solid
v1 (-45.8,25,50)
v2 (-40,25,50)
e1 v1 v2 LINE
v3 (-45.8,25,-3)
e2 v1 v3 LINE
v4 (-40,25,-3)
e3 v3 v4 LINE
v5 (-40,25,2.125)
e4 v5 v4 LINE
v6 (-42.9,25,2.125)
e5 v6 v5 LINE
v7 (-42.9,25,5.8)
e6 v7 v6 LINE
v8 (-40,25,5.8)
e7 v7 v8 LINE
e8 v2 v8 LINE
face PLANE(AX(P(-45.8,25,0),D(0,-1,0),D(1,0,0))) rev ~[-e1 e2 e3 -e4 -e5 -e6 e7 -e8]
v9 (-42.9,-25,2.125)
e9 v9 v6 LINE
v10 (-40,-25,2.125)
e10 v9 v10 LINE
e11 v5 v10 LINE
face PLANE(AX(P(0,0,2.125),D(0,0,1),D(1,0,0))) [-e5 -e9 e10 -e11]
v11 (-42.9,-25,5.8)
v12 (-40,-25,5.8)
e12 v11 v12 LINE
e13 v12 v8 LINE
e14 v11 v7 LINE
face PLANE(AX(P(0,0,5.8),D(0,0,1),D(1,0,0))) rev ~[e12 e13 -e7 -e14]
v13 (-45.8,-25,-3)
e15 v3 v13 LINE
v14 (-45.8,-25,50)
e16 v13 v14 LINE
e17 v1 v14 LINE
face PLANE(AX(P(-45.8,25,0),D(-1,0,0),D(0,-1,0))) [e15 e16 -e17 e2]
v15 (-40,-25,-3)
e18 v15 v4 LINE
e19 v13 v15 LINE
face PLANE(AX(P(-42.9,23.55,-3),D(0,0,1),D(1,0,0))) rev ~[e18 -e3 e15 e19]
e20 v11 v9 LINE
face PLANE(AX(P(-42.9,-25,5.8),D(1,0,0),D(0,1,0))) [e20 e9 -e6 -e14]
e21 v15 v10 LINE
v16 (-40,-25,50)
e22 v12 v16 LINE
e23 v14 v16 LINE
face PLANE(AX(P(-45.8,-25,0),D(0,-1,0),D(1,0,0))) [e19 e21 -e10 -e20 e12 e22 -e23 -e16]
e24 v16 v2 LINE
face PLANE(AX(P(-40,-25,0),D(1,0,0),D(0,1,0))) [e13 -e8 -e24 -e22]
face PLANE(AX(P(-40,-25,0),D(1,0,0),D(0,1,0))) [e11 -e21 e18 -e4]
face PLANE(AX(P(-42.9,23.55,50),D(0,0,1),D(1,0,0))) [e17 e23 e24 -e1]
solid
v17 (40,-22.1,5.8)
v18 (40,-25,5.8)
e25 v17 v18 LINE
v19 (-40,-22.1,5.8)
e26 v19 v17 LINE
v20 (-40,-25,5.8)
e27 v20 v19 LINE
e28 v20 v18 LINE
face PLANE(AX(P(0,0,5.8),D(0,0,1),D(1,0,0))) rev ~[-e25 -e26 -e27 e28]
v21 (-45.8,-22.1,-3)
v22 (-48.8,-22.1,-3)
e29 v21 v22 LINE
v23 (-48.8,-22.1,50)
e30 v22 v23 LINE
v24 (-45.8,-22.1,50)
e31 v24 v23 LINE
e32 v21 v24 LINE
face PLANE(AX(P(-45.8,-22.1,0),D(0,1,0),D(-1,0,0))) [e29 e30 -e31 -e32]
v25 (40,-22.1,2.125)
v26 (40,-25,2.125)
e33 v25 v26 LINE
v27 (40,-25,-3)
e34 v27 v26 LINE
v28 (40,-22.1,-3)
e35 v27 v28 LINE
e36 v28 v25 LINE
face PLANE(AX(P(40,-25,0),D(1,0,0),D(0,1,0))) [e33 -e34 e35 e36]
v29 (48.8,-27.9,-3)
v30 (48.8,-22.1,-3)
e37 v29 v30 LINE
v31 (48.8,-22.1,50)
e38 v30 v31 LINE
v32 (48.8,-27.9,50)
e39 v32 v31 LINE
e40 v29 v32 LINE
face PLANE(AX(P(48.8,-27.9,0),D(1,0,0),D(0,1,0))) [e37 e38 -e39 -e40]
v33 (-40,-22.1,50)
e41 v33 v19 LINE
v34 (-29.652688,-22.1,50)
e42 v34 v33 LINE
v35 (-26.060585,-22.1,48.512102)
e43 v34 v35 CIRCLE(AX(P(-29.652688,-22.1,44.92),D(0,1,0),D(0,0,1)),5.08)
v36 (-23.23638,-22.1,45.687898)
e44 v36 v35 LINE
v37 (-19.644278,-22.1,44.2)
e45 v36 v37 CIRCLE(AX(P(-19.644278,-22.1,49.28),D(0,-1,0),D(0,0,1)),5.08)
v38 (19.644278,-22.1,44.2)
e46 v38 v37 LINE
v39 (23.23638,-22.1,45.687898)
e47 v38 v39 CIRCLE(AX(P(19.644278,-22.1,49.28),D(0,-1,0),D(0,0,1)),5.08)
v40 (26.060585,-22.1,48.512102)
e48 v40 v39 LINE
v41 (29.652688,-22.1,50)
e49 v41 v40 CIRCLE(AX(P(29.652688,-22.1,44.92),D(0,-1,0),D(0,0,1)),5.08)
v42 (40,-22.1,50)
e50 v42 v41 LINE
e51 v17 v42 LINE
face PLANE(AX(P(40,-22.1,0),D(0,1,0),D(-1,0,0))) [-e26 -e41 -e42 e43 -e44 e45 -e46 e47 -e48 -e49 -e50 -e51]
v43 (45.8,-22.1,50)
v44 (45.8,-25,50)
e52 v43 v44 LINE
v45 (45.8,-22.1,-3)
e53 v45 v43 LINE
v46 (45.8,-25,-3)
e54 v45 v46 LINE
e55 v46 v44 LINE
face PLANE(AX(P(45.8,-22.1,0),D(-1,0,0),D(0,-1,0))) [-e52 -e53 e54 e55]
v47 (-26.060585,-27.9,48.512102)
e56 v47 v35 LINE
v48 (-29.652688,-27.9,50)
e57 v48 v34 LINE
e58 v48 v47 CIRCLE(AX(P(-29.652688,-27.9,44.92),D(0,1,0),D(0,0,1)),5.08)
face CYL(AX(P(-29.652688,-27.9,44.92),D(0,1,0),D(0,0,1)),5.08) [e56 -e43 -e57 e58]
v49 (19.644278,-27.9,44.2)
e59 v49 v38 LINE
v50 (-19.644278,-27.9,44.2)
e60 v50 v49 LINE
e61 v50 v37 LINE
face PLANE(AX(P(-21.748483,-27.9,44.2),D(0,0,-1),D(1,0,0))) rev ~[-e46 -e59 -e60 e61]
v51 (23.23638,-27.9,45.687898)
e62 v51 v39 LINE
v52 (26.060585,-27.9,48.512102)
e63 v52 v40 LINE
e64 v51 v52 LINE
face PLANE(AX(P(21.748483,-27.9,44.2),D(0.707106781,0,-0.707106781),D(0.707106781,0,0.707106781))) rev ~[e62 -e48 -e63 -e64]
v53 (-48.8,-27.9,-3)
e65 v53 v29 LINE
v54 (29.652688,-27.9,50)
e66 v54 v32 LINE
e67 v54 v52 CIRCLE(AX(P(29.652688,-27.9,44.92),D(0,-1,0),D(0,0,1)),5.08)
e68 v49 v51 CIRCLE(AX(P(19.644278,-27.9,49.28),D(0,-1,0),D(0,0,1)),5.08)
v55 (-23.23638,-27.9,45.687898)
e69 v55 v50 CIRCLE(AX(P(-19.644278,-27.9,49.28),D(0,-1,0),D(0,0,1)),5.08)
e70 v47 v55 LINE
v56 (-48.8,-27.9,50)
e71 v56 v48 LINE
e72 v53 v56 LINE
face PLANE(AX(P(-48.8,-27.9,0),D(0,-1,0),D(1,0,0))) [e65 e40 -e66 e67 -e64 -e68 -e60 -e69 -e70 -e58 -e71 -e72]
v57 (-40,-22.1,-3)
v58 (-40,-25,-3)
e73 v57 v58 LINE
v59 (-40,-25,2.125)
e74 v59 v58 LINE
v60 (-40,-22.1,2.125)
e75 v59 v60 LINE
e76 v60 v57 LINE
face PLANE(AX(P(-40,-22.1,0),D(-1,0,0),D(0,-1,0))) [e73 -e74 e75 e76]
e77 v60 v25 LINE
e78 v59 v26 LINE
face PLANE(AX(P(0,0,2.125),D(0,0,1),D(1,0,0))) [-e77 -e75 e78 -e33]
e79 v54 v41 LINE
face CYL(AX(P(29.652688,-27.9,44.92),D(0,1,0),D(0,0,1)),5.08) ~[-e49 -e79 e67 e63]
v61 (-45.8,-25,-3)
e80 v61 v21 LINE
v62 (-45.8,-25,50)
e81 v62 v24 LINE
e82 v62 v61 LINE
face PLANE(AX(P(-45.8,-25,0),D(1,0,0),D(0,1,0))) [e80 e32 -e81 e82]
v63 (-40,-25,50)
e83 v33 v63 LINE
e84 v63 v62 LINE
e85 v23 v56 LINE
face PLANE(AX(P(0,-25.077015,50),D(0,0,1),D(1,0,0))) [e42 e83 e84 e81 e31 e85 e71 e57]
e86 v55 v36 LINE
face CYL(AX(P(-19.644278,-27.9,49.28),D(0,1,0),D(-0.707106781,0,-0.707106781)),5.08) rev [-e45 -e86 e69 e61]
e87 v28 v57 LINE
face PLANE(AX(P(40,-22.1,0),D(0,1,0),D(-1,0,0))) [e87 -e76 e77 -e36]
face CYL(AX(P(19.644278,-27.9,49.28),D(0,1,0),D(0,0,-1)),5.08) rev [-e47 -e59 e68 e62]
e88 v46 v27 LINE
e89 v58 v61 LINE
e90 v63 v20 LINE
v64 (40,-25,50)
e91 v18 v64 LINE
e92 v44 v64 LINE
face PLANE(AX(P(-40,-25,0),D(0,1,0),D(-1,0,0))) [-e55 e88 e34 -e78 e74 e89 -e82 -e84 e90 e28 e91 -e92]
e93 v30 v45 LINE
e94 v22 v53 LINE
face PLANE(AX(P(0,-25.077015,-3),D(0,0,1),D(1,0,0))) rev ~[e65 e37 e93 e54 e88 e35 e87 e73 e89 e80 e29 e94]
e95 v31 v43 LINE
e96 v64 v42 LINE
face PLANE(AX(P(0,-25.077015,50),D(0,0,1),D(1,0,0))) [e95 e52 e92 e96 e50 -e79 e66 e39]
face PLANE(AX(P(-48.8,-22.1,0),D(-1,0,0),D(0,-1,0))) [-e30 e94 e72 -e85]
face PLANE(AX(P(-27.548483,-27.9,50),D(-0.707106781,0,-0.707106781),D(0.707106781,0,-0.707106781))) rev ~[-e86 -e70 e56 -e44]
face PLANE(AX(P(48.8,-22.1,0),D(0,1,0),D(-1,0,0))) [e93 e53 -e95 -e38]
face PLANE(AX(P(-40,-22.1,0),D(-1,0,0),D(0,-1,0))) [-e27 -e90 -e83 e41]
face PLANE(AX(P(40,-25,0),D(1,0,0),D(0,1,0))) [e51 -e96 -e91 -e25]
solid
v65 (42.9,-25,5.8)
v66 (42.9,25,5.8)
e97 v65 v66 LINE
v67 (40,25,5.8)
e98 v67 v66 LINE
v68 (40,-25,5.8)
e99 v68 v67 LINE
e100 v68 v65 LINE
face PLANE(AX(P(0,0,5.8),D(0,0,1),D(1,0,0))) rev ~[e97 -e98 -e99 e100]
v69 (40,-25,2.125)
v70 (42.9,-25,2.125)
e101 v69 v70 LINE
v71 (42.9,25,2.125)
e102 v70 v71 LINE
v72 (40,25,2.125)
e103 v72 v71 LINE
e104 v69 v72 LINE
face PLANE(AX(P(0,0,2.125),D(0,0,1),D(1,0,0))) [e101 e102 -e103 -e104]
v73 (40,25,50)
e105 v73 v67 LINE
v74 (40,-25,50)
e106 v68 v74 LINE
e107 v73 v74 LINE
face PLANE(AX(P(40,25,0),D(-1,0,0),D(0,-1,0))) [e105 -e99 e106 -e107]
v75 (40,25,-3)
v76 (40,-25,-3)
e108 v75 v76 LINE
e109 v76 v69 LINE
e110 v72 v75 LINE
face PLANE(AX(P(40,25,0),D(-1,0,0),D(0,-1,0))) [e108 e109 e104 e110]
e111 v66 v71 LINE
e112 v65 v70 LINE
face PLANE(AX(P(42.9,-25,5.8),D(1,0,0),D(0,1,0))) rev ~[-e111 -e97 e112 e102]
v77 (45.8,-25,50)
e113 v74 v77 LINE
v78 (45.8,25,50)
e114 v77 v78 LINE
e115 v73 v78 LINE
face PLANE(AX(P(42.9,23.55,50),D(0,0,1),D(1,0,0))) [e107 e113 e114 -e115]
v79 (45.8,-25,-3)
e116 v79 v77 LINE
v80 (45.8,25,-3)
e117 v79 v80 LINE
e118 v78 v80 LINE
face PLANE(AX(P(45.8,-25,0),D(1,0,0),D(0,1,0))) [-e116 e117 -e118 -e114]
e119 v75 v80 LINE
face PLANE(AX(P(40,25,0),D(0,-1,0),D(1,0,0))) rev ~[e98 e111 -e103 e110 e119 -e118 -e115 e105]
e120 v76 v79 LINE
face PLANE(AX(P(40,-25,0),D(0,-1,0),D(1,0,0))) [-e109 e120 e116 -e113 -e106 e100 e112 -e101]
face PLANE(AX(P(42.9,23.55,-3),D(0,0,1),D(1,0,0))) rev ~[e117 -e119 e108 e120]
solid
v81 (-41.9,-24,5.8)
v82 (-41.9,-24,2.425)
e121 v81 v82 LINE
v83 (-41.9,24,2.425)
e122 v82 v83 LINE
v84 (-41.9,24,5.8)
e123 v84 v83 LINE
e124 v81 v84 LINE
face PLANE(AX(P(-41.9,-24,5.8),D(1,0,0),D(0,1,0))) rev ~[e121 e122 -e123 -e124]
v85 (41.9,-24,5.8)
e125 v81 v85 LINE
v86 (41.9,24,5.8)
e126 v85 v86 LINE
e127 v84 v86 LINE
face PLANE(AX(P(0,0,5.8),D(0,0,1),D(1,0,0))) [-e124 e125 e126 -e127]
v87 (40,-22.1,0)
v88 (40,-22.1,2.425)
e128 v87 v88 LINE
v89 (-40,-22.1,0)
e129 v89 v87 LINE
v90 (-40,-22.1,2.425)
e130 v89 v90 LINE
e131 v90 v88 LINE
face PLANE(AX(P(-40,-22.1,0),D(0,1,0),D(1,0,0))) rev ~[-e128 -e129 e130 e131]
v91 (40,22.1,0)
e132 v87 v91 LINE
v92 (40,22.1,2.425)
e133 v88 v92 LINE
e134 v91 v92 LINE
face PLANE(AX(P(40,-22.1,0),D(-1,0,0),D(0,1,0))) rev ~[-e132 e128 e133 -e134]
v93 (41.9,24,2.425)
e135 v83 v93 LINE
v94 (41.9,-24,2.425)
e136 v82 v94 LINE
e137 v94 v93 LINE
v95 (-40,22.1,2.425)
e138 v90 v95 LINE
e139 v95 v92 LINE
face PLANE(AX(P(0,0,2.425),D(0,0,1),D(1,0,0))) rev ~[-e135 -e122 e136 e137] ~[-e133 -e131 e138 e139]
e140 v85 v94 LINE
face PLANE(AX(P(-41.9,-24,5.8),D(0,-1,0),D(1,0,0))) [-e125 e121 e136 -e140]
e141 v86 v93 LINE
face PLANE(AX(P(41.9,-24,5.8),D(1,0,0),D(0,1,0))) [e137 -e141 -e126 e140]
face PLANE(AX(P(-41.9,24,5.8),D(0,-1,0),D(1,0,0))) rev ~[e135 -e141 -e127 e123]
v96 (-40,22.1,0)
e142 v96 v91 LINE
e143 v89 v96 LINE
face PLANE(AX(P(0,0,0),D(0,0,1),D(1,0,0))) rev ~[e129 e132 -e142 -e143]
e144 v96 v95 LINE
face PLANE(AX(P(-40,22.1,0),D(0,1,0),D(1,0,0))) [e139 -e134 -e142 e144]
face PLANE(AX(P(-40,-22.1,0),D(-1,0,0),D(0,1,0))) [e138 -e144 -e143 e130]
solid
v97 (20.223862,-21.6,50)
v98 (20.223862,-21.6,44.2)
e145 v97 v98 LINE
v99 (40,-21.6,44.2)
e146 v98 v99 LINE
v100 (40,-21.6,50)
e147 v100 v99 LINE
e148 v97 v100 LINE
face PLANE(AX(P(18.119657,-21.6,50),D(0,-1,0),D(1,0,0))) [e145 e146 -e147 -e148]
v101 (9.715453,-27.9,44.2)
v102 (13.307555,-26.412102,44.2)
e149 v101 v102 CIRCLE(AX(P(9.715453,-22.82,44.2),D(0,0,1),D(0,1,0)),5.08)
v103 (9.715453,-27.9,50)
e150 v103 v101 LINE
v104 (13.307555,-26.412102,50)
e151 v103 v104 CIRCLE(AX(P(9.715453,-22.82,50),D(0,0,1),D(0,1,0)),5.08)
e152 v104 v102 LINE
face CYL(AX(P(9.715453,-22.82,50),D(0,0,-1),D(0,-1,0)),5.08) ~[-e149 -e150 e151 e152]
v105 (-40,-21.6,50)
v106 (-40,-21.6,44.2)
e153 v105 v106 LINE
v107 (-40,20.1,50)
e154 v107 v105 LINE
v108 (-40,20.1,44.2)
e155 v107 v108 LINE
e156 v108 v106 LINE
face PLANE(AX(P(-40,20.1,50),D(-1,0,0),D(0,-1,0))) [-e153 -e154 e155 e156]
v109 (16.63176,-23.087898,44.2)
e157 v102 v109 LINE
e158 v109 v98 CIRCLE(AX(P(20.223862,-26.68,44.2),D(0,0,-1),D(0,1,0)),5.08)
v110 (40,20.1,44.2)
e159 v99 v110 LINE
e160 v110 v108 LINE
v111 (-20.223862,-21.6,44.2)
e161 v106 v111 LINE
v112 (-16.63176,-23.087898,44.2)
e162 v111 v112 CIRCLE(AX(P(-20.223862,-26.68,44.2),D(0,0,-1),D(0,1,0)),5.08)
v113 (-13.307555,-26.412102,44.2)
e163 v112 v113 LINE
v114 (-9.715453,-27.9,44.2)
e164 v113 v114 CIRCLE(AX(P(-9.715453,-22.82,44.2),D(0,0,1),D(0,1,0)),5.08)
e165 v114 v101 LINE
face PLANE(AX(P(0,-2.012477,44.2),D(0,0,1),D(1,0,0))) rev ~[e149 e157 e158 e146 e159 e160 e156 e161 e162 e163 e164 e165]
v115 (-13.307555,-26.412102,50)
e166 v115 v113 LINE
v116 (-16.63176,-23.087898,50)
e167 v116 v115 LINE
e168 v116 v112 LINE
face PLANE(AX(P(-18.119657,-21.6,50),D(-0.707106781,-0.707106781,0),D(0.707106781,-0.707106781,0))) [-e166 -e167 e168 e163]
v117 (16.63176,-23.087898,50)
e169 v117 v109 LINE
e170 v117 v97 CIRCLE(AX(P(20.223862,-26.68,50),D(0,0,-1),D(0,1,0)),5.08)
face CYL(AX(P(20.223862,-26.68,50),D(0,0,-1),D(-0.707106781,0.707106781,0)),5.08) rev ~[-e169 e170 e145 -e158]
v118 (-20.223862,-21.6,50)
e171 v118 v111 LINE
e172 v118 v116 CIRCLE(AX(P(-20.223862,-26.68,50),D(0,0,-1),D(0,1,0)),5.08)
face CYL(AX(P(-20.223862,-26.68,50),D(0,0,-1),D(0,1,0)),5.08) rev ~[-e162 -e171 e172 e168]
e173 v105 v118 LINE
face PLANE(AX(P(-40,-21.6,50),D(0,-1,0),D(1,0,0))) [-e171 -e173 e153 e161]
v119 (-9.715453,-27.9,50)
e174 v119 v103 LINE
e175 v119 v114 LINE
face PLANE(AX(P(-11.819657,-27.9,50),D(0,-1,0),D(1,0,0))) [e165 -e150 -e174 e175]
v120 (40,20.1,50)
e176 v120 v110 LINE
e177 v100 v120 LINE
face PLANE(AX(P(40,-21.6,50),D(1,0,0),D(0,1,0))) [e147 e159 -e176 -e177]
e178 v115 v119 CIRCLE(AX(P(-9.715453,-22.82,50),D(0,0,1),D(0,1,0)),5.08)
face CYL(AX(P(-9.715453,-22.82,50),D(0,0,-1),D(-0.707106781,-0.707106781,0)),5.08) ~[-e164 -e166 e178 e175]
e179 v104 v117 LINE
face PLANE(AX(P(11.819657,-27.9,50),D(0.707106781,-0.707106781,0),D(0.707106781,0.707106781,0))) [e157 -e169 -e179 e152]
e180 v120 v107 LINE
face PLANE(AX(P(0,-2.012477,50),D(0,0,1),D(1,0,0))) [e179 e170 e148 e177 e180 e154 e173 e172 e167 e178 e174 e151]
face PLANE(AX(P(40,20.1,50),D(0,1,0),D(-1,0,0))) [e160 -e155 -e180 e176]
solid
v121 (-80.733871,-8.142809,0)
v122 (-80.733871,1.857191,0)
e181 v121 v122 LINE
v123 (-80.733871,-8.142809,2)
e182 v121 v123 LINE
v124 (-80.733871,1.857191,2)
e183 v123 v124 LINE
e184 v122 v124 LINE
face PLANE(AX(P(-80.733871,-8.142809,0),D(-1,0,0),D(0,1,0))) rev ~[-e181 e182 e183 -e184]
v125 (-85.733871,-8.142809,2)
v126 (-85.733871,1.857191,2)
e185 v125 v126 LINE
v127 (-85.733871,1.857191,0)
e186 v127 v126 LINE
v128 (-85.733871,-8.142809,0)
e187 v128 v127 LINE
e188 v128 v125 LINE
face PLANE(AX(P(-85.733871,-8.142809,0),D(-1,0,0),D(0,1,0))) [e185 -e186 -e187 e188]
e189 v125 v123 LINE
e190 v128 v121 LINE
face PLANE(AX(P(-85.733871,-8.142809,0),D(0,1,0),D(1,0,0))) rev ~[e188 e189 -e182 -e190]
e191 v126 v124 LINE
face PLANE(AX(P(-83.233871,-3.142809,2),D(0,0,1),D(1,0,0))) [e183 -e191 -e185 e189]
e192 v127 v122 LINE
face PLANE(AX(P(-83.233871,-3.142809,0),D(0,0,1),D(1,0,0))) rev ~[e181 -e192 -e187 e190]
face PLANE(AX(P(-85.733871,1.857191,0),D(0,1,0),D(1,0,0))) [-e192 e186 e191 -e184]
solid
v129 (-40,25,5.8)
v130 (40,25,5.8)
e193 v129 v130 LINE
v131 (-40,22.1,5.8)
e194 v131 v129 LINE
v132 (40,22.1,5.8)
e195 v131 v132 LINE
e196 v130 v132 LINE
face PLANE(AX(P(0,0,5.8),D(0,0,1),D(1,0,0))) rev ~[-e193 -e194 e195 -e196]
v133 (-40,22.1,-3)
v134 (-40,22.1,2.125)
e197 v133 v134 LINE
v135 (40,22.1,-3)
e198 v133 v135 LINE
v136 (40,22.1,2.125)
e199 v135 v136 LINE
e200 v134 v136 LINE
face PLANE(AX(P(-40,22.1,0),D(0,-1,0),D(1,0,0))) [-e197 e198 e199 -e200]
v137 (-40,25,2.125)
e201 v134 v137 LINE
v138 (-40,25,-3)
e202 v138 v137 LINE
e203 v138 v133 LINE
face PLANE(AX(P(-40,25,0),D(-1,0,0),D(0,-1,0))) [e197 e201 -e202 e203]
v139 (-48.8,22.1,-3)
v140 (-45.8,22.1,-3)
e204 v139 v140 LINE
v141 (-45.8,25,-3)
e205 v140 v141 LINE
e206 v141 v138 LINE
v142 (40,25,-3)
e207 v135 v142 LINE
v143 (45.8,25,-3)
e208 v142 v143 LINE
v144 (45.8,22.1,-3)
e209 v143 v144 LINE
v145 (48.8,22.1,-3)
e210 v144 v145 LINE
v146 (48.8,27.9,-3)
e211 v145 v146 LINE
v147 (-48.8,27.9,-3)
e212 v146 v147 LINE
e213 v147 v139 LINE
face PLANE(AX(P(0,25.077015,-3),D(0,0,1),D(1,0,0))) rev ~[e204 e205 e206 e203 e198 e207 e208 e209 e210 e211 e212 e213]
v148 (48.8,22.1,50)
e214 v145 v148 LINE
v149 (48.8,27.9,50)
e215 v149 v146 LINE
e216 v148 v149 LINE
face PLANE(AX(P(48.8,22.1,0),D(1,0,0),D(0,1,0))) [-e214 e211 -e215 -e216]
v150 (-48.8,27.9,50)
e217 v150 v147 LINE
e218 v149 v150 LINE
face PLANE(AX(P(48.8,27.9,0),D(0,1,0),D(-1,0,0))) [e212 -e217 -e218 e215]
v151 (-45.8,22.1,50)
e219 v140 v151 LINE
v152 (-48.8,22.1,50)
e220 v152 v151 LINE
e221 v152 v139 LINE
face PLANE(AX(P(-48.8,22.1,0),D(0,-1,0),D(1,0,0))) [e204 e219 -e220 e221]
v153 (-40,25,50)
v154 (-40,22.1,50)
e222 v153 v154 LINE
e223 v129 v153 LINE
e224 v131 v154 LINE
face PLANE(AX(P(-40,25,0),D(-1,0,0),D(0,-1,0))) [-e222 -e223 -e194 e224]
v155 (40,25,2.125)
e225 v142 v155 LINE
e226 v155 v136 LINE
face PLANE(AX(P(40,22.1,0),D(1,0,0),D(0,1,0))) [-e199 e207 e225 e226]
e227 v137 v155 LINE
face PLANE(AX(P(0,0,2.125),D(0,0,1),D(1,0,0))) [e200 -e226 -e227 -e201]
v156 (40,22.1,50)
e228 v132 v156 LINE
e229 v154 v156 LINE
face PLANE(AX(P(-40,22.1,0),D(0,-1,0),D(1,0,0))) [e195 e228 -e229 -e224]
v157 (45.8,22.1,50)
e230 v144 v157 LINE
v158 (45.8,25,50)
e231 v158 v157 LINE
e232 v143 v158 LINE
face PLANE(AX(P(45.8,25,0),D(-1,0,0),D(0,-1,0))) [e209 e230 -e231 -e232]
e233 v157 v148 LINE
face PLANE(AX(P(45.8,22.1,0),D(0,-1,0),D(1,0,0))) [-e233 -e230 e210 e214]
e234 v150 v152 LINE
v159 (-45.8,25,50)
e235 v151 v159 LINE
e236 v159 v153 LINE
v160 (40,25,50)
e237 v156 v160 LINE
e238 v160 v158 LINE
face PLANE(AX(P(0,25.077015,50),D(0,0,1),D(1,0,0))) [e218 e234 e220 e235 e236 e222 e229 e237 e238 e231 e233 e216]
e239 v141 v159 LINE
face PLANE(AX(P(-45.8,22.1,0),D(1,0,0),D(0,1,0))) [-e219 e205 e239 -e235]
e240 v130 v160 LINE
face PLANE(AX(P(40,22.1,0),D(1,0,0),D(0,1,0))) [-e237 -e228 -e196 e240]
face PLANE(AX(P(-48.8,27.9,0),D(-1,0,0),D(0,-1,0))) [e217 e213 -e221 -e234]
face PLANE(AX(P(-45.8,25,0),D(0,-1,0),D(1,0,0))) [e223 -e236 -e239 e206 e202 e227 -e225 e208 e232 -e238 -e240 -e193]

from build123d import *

# Parameters (mm, degrees)
F6_DEPTH      = 50
F6_DEPTH_BACK = 3
F5_W          = 5.8
F5_H          = 2.9
F5_H_2        = 44.2
F7_DEPTH      = 50
F7_DEPTH_BACK = 3
F5_W_2        = 80
F8_DEPTH      = 5.8
F9_W          = 85.8
F9_H          = 50
F9_W_2        = 83.8
F9_H_2        = 48
F9_W_3        = 80
F9_H_3        = 44.2
F10_DEPTH     = 3.675
F11_DEPTH     = 3.375
F13_DEPTH     = 5.8
F15_DEPTH     = 25.4
F16_R         = 5.08
F16_2_R       = 5.08
F17_W         = 5
F17_H         = 10
F18_DEPTH     = 2


# Not quite as in the source:
# - a length typed as a fraction of an inch, garbled in the dataset ("3 / 203.2 mm" for 3/8 in), is restored


with BuildPart() as f6:
    # F5 (on Top) → F6 (new body, two sides)
    with BuildSketch(Plane.XY) as f6_sk:
        Polygon((-48.8, 22.1), (-45.8, 22.1), (-45.8, 25), (-40, 25), (-40, 22.1), (40, 22.1), (40, 25), (45.8, 25), (45.8, 22.1), (48.8, 22.1), (48.8, 27.9), (-48.8, 27.9), align=None)
    extrude(amount=F6_DEPTH)
    extrude(f6_sk.sketch, amount=-F6_DEPTH_BACK)


with BuildPart() as f6b:
    # F5 (on Top) → F6, piece 2 (new body, two sides)
    with BuildSketch(Plane.XY) as f6_2_sk:
        Polygon((-45.8, -25), (-45.8, -22.1), (-48.8, -22.1), (-48.8, -27.9), (48.8, -27.9), (48.8, -22.1), (45.8, -22.1), (45.8, -25), (40, -25), (40, -22.1), (-40, -22.1), (-40, -25), align=None)
    extrude(amount=F6_DEPTH)
    extrude(f6_2_sk.sketch, amount=-F6_DEPTH_BACK)


with BuildPart() as f7:
    # F5 (on Top) → F7 (new body, two sides)
    with BuildSketch(Plane.XY) as f7_sk:
        with Locations((-42.9, 23.55)):
            Rectangle(F5_W, F5_H)
        with Locations((-42.9, 0)):
            Rectangle(F5_W, F5_H_2)
        with Locations((-42.9, -23.55)):
            Rectangle(F5_W, F5_H)
    extrude(amount=F7_DEPTH)
    extrude(f7_sk.sketch, amount=-F7_DEPTH_BACK)


with BuildPart() as f7b:
    # F5 (on Top) → F7, piece 2 (new body, two sides)
    with BuildSketch(Plane.XY) as f7_2_sk:
        with Locations((42.9, 23.55)):
            Rectangle(F5_W, F5_H)
        with Locations((42.9, 0)):
            Rectangle(F5_W, F5_H_2)
        with Locations((42.9, -23.55)):
            Rectangle(F5_W, F5_H)
    extrude(amount=F7_DEPTH)
    extrude(f7_2_sk.sketch, amount=-F7_DEPTH_BACK)


with BuildPart() as f8:
    # F5 (on Top) → F8 (new body)
    with BuildSketch(Plane.XY):
        Rectangle(F5_W_2, F5_H_2)
    extrude(amount=F8_DEPTH)

    # F9 (on face) → F11 (join)
    with BuildSketch(Plane.XY.offset(5.8)):
        Rectangle(F9_W_2, F9_H_2)
        Rectangle(F9_W_3, F9_H_3, mode=Mode.SUBTRACT)
    extrude(amount=-F11_DEPTH)


with BuildPart() as f10_tool:
    # F9 (on face) → F10 (new body)
    with BuildSketch(Plane.XY.offset(5.8)):
        Rectangle(F9_W, F9_H)
        Rectangle(F9_W_2, F9_H_2, mode=Mode.SUBTRACT)
        Rectangle(F9_W_2, F9_H_2)
        Rectangle(F9_W_3, F9_H_3, mode=Mode.SUBTRACT)
    extrude(amount=-F10_DEPTH)


with BuildPart() as f6_1:
    add(f6.part)

    # F10: cut by f10_tool
    add(f10_tool.part, mode=Mode.SUBTRACT)


with BuildPart() as f6b_1:
    add(f6b.part)

    # F10: cut by f10_tool
    add(f10_tool.part, mode=Mode.SUBTRACT)

    # F14 (on face) → F15 (cut)
    with BuildSketch(Plane.XZ.offset(27.9)):
        Polygon((0, 50), (-27.5484826416, 50), (-21.7484826416, 44.2), (0, 44.2), (21.7484826416, 44.2), (27.5484826416, 50), align=None)
    extrude(amount=-F15_DEPTH, mode=Mode.SUBTRACT)

    # F16
    f16_edges = [f6b_1.edges().sort_by_distance(p)[0] for p in [
        (-27.548483, -25, 50),
        (-21.748483, -25, 44.2),
        (21.748483, -25, 44.2),
        (27.548483, -25, 50),
    ]]
    fillet(f16_edges, radius=F16_R)


with BuildPart() as f7_1:
    add(f7.part)

    # F10: cut by f10_tool
    add(f10_tool.part, mode=Mode.SUBTRACT)


with BuildPart() as f7b_1:
    add(f7b.part)

    # F10: cut by f10_tool
    add(f10_tool.part, mode=Mode.SUBTRACT)


with BuildPart() as f13:
    # F12 (on face) → F13 (new body)
    with BuildSketch(Plane.XY.offset(50)):
        Polygon((40, 20.1), (-40, 20.1), (-40, -21.6), (-18.1196574122, -21.6), (-11.8196574122, -27.9), (0, -27.9), (11.8196574122, -27.9), (18.1196574122, -21.6), (40, -21.6), align=None)
    extrude(amount=-F13_DEPTH)

    # F16#2
    f16_2_edges = [f13.edges().sort_by_distance(p)[0] for p in [
        (18.119657, -21.6, 47.1),
        (11.819657, -27.9, 47.1),
        (-11.819657, -27.9, 47.1),
        (-18.119657, -21.6, 47.1),
    ]]
    fillet(f16_2_edges, radius=F16_2_R)


with BuildPart() as f18:
    # F17 (on Top) → F18 (new body)
    with BuildSketch(Plane.XY):
        with Locations((-83.2338705659, -3.1428090297)):
            Rectangle(F17_W, F17_H)
    extrude(amount=F18_DEPTH)


solid = Compound([f8.part, f6_1.part, f6b_1.part, f7_1.part, f7b_1.part, f13.part, f18.part])
